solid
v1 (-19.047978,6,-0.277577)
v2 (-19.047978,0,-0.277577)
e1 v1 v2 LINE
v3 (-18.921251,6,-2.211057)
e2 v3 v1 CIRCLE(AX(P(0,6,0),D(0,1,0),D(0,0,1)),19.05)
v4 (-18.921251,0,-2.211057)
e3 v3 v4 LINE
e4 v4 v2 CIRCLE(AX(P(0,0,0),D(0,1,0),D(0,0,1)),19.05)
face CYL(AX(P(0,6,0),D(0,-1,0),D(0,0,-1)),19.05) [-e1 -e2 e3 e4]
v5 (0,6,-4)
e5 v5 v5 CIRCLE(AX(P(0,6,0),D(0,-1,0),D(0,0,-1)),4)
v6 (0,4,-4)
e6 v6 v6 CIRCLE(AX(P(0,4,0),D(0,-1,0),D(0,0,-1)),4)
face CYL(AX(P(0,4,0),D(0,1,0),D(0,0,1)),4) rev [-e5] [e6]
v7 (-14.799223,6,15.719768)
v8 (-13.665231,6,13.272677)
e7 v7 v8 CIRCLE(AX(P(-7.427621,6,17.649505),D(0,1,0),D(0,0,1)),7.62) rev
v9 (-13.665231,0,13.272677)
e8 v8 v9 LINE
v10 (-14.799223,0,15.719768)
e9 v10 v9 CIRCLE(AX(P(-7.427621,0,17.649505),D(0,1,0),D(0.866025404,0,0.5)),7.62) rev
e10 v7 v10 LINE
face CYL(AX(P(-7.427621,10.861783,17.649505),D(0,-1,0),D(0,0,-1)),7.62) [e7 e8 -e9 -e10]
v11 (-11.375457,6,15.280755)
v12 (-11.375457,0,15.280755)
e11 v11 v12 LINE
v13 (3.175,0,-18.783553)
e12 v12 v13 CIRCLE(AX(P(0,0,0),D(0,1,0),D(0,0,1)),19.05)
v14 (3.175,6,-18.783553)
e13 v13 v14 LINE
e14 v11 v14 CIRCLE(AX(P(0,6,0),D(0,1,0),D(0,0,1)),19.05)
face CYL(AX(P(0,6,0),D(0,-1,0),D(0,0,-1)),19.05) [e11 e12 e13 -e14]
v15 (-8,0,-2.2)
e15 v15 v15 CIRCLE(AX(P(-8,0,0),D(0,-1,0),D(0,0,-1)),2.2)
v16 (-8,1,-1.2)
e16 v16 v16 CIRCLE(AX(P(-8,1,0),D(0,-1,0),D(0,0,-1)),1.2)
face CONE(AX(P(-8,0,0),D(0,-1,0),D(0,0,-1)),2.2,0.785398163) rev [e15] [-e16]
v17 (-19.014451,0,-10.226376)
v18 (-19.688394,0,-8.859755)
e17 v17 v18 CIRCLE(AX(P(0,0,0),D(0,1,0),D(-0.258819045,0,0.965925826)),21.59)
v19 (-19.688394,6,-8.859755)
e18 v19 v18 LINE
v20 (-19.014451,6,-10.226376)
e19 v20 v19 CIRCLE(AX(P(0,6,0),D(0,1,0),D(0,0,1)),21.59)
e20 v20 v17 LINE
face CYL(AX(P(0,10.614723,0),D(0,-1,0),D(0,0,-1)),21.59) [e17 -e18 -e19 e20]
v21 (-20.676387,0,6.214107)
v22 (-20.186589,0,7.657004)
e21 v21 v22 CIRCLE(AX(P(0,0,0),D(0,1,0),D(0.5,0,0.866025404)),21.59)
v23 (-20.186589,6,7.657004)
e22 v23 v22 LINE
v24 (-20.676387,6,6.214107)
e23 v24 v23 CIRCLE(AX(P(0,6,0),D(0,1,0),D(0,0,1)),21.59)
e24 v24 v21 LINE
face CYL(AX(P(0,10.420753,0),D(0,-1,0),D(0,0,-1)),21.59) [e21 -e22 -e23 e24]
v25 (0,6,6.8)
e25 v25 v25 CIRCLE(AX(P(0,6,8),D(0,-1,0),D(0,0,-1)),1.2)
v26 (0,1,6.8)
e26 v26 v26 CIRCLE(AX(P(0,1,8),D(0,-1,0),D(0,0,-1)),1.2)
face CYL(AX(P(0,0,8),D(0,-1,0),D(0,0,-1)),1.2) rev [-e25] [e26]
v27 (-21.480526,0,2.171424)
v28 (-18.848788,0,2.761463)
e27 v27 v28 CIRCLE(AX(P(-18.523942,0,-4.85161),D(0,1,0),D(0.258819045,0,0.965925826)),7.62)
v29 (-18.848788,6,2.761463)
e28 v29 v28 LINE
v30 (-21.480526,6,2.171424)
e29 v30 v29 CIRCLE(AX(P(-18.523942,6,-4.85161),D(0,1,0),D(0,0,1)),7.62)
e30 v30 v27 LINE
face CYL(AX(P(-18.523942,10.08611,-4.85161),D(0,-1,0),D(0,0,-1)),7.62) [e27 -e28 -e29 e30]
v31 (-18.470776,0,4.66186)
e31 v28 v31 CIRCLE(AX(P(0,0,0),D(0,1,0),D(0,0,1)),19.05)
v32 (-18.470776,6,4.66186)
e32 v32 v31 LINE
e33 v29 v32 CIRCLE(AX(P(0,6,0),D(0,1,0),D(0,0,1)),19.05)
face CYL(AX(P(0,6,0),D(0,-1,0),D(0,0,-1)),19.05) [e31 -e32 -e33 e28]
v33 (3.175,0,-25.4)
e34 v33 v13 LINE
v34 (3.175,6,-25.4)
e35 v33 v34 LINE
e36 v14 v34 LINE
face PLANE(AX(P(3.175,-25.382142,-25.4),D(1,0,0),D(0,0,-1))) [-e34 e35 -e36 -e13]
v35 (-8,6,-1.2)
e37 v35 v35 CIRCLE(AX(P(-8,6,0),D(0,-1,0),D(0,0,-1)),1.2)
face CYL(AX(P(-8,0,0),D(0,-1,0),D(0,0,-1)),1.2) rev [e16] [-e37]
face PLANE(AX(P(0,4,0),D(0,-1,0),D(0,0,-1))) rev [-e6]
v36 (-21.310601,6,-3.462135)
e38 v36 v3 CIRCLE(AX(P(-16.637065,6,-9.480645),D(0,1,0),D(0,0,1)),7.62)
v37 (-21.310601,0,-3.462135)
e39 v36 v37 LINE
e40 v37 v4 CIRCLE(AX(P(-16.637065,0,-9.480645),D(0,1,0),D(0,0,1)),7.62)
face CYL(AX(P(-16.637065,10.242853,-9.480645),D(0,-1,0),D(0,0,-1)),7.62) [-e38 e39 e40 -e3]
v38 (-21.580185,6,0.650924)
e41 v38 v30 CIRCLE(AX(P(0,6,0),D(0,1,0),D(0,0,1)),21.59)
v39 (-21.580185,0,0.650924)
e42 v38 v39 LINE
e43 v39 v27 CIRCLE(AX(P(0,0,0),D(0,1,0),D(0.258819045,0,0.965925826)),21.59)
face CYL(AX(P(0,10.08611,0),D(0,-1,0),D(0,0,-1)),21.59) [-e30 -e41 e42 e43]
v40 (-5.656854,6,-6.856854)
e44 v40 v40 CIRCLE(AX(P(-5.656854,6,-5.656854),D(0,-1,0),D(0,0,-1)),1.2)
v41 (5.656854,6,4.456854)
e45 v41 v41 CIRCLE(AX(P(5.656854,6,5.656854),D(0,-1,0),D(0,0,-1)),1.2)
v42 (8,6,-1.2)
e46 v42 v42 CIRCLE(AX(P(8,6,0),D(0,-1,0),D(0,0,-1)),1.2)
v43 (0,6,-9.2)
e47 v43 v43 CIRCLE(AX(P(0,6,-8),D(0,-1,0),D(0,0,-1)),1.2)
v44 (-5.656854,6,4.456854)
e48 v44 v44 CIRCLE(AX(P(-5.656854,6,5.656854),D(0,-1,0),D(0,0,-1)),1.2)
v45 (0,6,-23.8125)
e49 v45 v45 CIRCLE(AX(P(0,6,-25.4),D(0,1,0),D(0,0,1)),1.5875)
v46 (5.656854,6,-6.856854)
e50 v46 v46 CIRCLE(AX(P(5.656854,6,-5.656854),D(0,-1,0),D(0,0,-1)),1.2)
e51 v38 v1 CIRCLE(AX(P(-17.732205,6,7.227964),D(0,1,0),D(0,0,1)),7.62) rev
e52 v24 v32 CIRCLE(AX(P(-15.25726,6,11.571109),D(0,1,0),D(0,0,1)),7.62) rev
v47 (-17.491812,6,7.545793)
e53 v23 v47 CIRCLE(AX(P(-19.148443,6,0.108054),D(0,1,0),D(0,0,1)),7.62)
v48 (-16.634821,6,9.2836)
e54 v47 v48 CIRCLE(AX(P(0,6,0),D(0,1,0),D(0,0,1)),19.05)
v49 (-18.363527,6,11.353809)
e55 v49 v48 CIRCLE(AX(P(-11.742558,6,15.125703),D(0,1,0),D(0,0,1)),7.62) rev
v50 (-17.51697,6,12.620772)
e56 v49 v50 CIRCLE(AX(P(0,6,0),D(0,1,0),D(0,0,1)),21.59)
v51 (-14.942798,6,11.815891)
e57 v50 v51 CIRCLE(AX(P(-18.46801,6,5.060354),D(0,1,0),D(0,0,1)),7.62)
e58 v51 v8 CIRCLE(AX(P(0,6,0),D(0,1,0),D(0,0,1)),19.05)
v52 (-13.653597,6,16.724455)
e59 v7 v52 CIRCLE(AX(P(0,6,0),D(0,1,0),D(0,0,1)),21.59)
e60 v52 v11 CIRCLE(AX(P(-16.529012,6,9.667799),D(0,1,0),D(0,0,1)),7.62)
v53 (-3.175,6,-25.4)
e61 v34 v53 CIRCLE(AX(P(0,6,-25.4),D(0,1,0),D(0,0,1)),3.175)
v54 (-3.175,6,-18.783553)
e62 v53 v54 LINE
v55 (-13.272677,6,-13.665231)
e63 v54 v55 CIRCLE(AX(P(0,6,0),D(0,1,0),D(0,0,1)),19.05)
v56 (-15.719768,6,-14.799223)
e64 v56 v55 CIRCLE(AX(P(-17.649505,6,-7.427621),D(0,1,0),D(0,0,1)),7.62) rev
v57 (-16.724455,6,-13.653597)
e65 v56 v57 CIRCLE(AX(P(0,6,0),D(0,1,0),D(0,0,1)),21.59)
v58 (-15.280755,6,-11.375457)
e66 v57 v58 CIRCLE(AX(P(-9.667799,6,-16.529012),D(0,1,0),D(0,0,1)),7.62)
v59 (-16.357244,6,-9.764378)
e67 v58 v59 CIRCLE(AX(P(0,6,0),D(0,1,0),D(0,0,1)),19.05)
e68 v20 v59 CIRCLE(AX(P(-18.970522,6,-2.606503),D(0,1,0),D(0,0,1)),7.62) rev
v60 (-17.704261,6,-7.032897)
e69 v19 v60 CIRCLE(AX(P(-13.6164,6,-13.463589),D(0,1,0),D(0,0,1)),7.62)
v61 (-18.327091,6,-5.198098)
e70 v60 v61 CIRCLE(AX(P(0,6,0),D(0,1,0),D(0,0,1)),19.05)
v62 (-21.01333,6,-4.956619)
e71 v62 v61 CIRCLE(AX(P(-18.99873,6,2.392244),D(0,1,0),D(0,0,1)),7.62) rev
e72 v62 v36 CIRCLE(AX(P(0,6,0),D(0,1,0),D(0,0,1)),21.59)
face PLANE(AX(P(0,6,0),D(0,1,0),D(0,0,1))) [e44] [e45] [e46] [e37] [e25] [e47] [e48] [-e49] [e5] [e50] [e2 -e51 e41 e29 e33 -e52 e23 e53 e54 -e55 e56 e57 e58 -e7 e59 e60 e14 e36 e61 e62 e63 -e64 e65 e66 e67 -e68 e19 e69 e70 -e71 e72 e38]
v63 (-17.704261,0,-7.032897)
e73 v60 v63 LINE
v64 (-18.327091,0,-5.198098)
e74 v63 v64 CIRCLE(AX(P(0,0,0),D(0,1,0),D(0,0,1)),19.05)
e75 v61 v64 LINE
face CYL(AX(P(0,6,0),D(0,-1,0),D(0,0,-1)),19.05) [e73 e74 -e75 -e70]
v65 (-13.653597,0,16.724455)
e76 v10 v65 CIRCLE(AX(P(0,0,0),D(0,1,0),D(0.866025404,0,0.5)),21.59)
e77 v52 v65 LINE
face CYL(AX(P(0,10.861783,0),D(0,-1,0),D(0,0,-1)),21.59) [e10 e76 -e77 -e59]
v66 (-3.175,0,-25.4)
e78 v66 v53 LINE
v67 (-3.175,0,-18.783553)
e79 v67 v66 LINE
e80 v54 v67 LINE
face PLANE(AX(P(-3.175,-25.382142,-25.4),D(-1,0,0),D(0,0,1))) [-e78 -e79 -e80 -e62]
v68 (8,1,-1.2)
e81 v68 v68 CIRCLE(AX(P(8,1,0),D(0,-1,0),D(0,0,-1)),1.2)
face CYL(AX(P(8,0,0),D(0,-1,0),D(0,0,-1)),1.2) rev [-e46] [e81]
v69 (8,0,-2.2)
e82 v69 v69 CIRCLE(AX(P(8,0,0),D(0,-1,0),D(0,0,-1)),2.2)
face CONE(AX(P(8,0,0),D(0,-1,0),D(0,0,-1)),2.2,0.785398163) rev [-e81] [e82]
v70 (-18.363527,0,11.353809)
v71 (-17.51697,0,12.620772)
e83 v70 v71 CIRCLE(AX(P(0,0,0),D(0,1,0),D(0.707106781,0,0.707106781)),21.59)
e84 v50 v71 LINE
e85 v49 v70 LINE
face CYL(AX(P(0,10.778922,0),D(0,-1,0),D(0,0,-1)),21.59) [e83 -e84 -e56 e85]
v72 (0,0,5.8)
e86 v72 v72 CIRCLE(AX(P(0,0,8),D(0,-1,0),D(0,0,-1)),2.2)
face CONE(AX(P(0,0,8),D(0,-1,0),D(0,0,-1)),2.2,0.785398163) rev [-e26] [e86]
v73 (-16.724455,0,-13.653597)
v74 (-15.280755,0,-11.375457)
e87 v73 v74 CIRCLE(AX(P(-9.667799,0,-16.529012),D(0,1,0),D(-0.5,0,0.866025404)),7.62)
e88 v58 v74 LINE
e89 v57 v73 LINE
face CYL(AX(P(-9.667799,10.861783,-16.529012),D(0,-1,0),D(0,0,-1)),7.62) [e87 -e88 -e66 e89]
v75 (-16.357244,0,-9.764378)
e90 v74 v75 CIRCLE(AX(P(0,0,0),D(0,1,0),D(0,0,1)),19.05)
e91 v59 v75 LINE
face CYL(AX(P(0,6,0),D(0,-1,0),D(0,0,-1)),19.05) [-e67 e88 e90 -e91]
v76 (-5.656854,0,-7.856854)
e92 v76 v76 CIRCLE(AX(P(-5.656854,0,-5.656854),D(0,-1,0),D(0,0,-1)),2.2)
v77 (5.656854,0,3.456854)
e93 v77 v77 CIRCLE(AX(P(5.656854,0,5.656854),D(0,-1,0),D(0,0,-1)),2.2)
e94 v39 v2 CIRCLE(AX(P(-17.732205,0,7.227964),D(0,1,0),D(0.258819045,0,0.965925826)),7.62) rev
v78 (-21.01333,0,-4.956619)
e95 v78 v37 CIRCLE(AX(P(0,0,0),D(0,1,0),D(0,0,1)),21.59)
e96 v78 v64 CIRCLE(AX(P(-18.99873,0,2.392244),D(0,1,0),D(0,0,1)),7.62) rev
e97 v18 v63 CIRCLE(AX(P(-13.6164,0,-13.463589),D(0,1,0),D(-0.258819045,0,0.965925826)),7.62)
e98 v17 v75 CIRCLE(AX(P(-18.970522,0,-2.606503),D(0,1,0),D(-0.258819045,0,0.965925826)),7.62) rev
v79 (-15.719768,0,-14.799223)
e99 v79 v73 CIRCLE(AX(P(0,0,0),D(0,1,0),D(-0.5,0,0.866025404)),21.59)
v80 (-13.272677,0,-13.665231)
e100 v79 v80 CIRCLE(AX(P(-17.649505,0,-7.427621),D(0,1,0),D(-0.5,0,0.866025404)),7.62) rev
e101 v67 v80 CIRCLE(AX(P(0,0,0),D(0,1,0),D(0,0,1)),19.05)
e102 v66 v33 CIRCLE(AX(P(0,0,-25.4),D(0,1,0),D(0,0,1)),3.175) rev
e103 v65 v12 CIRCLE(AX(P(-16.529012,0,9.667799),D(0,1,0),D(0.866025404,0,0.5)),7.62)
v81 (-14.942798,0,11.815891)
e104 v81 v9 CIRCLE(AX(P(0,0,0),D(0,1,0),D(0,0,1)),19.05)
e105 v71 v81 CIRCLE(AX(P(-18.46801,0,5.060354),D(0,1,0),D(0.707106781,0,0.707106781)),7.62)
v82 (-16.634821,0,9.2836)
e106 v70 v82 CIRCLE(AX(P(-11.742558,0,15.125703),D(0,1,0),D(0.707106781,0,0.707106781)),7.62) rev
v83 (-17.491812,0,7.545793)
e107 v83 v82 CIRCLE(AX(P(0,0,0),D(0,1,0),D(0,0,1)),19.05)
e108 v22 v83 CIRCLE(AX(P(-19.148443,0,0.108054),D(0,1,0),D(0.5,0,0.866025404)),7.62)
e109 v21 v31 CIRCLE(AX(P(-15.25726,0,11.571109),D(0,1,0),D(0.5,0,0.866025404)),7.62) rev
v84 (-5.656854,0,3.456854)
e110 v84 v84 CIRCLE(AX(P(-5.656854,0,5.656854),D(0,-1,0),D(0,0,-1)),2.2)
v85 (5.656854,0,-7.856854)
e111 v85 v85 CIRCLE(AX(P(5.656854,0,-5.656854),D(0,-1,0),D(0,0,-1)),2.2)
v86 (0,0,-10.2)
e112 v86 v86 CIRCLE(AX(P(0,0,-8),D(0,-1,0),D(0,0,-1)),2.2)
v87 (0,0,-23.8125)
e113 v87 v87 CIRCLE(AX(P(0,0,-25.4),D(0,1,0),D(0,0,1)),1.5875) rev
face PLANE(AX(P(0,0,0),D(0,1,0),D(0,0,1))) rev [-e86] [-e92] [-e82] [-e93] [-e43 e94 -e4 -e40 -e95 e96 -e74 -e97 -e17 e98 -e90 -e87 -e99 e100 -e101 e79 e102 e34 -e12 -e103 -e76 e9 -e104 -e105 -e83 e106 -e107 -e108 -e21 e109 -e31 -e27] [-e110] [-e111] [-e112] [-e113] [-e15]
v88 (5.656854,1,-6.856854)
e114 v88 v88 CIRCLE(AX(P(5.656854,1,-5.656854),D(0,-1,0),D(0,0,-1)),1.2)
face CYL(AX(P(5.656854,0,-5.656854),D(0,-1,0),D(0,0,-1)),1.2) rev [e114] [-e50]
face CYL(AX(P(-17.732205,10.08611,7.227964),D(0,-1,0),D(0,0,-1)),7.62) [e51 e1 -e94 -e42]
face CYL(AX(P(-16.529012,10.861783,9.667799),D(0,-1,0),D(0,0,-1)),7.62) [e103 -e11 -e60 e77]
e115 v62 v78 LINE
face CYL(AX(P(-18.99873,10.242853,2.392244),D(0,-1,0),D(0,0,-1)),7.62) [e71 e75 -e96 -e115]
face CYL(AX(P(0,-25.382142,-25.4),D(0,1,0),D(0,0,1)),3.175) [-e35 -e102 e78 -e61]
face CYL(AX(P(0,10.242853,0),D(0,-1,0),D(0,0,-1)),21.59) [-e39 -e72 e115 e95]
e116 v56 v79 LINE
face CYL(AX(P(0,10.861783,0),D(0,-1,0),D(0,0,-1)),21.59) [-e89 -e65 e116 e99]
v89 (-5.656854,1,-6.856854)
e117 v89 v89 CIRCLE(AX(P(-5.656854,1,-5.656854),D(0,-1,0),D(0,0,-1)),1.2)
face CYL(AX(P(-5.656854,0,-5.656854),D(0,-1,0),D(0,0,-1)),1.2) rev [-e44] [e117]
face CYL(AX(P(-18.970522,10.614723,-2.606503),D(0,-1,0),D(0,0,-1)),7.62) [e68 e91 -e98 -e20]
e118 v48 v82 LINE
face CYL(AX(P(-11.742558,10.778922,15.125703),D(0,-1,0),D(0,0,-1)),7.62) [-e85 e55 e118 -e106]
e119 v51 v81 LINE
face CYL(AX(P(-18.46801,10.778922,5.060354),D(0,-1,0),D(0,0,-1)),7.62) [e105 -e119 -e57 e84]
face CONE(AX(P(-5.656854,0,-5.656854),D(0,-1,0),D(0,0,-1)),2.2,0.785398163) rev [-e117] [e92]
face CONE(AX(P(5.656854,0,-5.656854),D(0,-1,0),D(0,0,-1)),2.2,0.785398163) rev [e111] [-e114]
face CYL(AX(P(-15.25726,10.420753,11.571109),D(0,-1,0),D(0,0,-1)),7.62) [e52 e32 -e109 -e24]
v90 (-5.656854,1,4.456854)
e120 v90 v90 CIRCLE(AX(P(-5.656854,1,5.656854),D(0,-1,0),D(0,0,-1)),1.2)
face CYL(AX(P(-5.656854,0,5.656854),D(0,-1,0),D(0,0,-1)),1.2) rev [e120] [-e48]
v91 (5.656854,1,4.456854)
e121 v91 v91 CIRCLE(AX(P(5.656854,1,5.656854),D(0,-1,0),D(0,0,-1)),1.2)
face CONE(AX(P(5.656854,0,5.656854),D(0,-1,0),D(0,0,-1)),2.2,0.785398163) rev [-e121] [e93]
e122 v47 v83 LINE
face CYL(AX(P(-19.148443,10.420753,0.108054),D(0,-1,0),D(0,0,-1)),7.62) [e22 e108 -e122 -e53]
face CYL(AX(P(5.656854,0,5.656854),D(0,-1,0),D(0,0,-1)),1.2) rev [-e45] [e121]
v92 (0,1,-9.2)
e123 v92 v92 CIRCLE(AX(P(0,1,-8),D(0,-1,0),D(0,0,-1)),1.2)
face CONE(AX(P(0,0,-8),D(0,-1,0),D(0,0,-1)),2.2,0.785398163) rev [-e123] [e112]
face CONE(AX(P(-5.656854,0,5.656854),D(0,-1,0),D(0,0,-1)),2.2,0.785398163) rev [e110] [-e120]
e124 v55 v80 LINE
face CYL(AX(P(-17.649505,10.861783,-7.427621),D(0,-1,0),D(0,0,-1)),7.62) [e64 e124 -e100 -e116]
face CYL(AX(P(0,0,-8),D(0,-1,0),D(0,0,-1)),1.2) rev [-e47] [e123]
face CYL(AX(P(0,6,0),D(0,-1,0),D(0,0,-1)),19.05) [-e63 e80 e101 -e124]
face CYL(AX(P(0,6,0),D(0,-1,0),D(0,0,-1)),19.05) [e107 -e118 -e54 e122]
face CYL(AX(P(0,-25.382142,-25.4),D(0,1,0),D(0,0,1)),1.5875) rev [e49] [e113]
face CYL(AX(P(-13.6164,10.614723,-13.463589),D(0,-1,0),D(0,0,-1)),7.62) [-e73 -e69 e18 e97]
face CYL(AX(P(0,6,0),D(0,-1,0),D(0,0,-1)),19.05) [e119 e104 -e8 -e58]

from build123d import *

# Parameters (mm, degrees)
SKETCH1_R                                       = 19.05
BOSS_EXTRUDE1_DEPTH                             = 6
SKETCH8_R                                       = 4
CUT_EXTRUDE4_DEPTH                              = 2
BOSS_EXTRUDE3_DEPTH                             = 6
CIRPATTERN2_DEPTH                               = 6
SKETCH4_R                                       = 1.5875
BOSS_EXTRUDE4_DEPTH                             = 6
CSK_FOR_M2_FLAT_HEAD_MACHINE_SCREW1_D           = 2.4
CSK_FOR_M2_FLAT_HEAD_MACHINE_SCREW1_CSINK_D     = 4.4
CSK_FOR_M2_FLAT_HEAD_MACHINE_SCREW1_CSINK_ANGLE = 90
CIRPATTERN3_COUNT                               = 8


# Read off the part's stored shape, not the designer's step: CirPattern2
with BuildPart() as part:
    # Sketch1 → Boss-Extrude1 (new body)
    with BuildSketch(Plane(origin=(0, 0, 0), x_dir=(1, 0, 0), z_dir=(0, 1, 0))):
        with Locations(Location((0, 0, 0), (0, 0, 270))):
            Circle(SKETCH1_R)
    extrude(amount=BOSS_EXTRUDE1_DEPTH)

    # Sketch8 → Cut-Extrude4 (cut)
    with BuildSketch(Plane.XZ.offset(-6)):
        with Locations(Location((0, 0, 0), (0, 0, 270))):
            Circle(SKETCH8_R)
    extrude(amount=CUT_EXTRUDE4_DEPTH, mode=Mode.SUBTRACT)

    # Sketch3 → Boss-Extrude3 (add)
    with BuildSketch(Plane(origin=(0, 0, 0), x_dir=(1, 0, 0), z_dir=(0, 1, 0))):
        with BuildLine():
            ThreePointArc((-18.32709122, 5.198098444), (-19.680979383, 5.197152008), (-21.013329851, 4.956618665))
            ThreePointArc((-21.013329851, 4.956618665), (-21.175154204, 4.212000052), (-21.310601203, 3.462134657))
            ThreePointArc((-21.310601203, 3.462134657), (-20.171718001, 2.730042376), (-18.921250622, 2.211057413))
            ThreePointArc((-18.921250622, 2.211057413), (-18.683959592, 3.716470634), (-18.32709122, 5.198098444))
        make_face()
    extrude(amount=BOSS_EXTRUDE3_DEPTH)

    # CirPattern2 outline → CirPattern2 (add)
    with BuildSketch(Plane(origin=(0, 0, 0), x_dir=(1, 0, 0), z_dir=(0, 1, 0))):
        with BuildLine():
            ThreePointArc((-17.704260875, 7.032897477), (-17.085425728, 8.425599549), (-16.357243856, 9.764377784))
            ThreePointArc((-16.357243856, 9.764377784), (-17.665244353, 10.113875638), (-19.014450689, 10.226375946))
            ThreePointArc((-19.014450689, 10.226375946), (-19.36348249, 9.549012822), (-19.688393689, 8.859754733))
            ThreePointArc((-19.688393689, 8.859754733), (-18.777796417, 7.857843228), (-17.704260875, 7.032897477))
        make_face()
        with BuildLine():
            ThreePointArc((-15.280755006, 11.375457202), (-14.322548335, 12.560537779), (-13.272677354, 13.665230916))
            ThreePointArc((-13.272677354, 13.665230916), (-14.445652113, 14.341355358), (-15.719768136, 14.799222606))
            ThreePointArc((-15.719768136, 14.799222606), (-16.232221443, 14.235276148), (-16.724454683, 13.653597166))
            ThreePointArc((-16.724454683, 13.653597166), (-16.104199039, 12.450145051), (-15.280755006, 11.375457202))
        make_face()
        with BuildLine():
            ThreePointArc((-11.375457197, -15.280755), (-12.560537774, -14.322548329), (-13.66523091, -13.272677349))
            ThreePointArc((-13.66523091, -13.272677349), (-14.341355358, -14.445652113), (-14.799222606, -15.719768136))
            ThreePointArc((-14.799222606, -15.719768136), (-14.235276148, -16.232221443), (-13.653597166, -16.724454683))
            ThreePointArc((-13.653597166, -16.724454683), (-12.450145051, -16.104199039), (-11.375457197, -15.280755))
        make_face()
        with BuildLine():
            ThreePointArc((-14.942798311, -11.81589093), (-15.839496111, -10.583612937), (-16.634821136, -9.28359982))
            ThreePointArc((-16.634821136, -9.28359982), (-17.59149541, -10.241612555), (-18.363526703, -11.353809363))
            ThreePointArc((-18.363526703, -11.353809363), (-17.95142893, -11.994761331), (-17.516969515, -12.620771728))
            ThreePointArc((-17.516969515, -12.620771728), (-16.193990063, -12.33312711), (-14.942798311, -11.81589093))
        make_face()
        with BuildLine():
            ThreePointArc((-17.491812414, -7.545793421), (-18.039018964, -6.123421813), (-18.470775793, -4.661860306))
            ThreePointArc((-18.470775793, -4.661860306), (-19.642804121, -5.339624026), (-20.676386801, -6.214107244))
            ThreePointArc((-20.676386801, -6.214107244), (-20.444221496, -6.939878056), (-20.18658934, -7.657004037))
            ThreePointArc((-20.18658934, -7.657004037), (-18.834241415, -7.72157295), (-17.491812414, -7.545793421))
        make_face()
        with BuildLine():
            ThreePointArc((-21.580185309, -0.650923987), (-21.543774153, -1.41205356), (-21.480526461, -2.171424174))
            ThreePointArc((-21.480526461, -2.171424174), (-20.190970338, -2.583806354), (-18.84878841, -2.761462559))
            ThreePointArc((-18.84878841, -2.761462559), (-19.009212486, -1.245929612), (-19.047977604, 0.277577285))
            ThreePointArc((-19.047977604, 0.277577285), (-20.355488193, -0.073748943), (-21.580185309, -0.650923987))
        make_face()
    extrude(amount=CIRPATTERN2_DEPTH)

    # Sketch4 → Boss-Extrude4 (add)
    with BuildSketch(Plane(origin=(0, 6, 0), x_dir=(1, 0, 0), z_dir=(0, 1, 0))):
        with BuildLine():
            Line((-3.175, 4.000000056), (3.175, 4.000000056))
            Line((3.175, 4.000000056), (3.175, 25.4))
            ThreePointArc((3.175, 25.4), (0, 28.575), (-3.175, 25.4))
            Line((-3.175, 25.4), (-3.175, 4.000000056))
        make_face()
        with Locations(Location((0, 25.4, 0), (0, 0, 270))):
            Circle(SKETCH4_R, mode=Mode.SUBTRACT)
    extrude(amount=-BOSS_EXTRUDE4_DEPTH)

    # CSK for M2 Flat Head Machine Screw1 (through all)
    with Locations(Plane.XZ):
        with Locations((0, -8)):
            csk_for_m2_flat_head_machine_screw1 = CounterSinkHole(CSK_FOR_M2_FLAT_HEAD_MACHINE_SCREW1_D / 2, CSK_FOR_M2_FLAT_HEAD_MACHINE_SCREW1_CSINK_D / 2, counter_sink_angle=CSK_FOR_M2_FLAT_HEAD_MACHINE_SCREW1_CSINK_ANGLE)

    # CirPattern3: CSK for M2 Flat Head Machine Screw1 ×8 about axis
    cirpattern3_axis = Axis((0, 0, 0), (0, 1, 0))
    for i in range(1, CIRPATTERN3_COUNT):
        add(csk_for_m2_flat_head_machine_screw1.rotate(cirpattern3_axis, i * 360 / CIRPATTERN3_COUNT), mode=Mode.SUBTRACT)


solid = part.part
